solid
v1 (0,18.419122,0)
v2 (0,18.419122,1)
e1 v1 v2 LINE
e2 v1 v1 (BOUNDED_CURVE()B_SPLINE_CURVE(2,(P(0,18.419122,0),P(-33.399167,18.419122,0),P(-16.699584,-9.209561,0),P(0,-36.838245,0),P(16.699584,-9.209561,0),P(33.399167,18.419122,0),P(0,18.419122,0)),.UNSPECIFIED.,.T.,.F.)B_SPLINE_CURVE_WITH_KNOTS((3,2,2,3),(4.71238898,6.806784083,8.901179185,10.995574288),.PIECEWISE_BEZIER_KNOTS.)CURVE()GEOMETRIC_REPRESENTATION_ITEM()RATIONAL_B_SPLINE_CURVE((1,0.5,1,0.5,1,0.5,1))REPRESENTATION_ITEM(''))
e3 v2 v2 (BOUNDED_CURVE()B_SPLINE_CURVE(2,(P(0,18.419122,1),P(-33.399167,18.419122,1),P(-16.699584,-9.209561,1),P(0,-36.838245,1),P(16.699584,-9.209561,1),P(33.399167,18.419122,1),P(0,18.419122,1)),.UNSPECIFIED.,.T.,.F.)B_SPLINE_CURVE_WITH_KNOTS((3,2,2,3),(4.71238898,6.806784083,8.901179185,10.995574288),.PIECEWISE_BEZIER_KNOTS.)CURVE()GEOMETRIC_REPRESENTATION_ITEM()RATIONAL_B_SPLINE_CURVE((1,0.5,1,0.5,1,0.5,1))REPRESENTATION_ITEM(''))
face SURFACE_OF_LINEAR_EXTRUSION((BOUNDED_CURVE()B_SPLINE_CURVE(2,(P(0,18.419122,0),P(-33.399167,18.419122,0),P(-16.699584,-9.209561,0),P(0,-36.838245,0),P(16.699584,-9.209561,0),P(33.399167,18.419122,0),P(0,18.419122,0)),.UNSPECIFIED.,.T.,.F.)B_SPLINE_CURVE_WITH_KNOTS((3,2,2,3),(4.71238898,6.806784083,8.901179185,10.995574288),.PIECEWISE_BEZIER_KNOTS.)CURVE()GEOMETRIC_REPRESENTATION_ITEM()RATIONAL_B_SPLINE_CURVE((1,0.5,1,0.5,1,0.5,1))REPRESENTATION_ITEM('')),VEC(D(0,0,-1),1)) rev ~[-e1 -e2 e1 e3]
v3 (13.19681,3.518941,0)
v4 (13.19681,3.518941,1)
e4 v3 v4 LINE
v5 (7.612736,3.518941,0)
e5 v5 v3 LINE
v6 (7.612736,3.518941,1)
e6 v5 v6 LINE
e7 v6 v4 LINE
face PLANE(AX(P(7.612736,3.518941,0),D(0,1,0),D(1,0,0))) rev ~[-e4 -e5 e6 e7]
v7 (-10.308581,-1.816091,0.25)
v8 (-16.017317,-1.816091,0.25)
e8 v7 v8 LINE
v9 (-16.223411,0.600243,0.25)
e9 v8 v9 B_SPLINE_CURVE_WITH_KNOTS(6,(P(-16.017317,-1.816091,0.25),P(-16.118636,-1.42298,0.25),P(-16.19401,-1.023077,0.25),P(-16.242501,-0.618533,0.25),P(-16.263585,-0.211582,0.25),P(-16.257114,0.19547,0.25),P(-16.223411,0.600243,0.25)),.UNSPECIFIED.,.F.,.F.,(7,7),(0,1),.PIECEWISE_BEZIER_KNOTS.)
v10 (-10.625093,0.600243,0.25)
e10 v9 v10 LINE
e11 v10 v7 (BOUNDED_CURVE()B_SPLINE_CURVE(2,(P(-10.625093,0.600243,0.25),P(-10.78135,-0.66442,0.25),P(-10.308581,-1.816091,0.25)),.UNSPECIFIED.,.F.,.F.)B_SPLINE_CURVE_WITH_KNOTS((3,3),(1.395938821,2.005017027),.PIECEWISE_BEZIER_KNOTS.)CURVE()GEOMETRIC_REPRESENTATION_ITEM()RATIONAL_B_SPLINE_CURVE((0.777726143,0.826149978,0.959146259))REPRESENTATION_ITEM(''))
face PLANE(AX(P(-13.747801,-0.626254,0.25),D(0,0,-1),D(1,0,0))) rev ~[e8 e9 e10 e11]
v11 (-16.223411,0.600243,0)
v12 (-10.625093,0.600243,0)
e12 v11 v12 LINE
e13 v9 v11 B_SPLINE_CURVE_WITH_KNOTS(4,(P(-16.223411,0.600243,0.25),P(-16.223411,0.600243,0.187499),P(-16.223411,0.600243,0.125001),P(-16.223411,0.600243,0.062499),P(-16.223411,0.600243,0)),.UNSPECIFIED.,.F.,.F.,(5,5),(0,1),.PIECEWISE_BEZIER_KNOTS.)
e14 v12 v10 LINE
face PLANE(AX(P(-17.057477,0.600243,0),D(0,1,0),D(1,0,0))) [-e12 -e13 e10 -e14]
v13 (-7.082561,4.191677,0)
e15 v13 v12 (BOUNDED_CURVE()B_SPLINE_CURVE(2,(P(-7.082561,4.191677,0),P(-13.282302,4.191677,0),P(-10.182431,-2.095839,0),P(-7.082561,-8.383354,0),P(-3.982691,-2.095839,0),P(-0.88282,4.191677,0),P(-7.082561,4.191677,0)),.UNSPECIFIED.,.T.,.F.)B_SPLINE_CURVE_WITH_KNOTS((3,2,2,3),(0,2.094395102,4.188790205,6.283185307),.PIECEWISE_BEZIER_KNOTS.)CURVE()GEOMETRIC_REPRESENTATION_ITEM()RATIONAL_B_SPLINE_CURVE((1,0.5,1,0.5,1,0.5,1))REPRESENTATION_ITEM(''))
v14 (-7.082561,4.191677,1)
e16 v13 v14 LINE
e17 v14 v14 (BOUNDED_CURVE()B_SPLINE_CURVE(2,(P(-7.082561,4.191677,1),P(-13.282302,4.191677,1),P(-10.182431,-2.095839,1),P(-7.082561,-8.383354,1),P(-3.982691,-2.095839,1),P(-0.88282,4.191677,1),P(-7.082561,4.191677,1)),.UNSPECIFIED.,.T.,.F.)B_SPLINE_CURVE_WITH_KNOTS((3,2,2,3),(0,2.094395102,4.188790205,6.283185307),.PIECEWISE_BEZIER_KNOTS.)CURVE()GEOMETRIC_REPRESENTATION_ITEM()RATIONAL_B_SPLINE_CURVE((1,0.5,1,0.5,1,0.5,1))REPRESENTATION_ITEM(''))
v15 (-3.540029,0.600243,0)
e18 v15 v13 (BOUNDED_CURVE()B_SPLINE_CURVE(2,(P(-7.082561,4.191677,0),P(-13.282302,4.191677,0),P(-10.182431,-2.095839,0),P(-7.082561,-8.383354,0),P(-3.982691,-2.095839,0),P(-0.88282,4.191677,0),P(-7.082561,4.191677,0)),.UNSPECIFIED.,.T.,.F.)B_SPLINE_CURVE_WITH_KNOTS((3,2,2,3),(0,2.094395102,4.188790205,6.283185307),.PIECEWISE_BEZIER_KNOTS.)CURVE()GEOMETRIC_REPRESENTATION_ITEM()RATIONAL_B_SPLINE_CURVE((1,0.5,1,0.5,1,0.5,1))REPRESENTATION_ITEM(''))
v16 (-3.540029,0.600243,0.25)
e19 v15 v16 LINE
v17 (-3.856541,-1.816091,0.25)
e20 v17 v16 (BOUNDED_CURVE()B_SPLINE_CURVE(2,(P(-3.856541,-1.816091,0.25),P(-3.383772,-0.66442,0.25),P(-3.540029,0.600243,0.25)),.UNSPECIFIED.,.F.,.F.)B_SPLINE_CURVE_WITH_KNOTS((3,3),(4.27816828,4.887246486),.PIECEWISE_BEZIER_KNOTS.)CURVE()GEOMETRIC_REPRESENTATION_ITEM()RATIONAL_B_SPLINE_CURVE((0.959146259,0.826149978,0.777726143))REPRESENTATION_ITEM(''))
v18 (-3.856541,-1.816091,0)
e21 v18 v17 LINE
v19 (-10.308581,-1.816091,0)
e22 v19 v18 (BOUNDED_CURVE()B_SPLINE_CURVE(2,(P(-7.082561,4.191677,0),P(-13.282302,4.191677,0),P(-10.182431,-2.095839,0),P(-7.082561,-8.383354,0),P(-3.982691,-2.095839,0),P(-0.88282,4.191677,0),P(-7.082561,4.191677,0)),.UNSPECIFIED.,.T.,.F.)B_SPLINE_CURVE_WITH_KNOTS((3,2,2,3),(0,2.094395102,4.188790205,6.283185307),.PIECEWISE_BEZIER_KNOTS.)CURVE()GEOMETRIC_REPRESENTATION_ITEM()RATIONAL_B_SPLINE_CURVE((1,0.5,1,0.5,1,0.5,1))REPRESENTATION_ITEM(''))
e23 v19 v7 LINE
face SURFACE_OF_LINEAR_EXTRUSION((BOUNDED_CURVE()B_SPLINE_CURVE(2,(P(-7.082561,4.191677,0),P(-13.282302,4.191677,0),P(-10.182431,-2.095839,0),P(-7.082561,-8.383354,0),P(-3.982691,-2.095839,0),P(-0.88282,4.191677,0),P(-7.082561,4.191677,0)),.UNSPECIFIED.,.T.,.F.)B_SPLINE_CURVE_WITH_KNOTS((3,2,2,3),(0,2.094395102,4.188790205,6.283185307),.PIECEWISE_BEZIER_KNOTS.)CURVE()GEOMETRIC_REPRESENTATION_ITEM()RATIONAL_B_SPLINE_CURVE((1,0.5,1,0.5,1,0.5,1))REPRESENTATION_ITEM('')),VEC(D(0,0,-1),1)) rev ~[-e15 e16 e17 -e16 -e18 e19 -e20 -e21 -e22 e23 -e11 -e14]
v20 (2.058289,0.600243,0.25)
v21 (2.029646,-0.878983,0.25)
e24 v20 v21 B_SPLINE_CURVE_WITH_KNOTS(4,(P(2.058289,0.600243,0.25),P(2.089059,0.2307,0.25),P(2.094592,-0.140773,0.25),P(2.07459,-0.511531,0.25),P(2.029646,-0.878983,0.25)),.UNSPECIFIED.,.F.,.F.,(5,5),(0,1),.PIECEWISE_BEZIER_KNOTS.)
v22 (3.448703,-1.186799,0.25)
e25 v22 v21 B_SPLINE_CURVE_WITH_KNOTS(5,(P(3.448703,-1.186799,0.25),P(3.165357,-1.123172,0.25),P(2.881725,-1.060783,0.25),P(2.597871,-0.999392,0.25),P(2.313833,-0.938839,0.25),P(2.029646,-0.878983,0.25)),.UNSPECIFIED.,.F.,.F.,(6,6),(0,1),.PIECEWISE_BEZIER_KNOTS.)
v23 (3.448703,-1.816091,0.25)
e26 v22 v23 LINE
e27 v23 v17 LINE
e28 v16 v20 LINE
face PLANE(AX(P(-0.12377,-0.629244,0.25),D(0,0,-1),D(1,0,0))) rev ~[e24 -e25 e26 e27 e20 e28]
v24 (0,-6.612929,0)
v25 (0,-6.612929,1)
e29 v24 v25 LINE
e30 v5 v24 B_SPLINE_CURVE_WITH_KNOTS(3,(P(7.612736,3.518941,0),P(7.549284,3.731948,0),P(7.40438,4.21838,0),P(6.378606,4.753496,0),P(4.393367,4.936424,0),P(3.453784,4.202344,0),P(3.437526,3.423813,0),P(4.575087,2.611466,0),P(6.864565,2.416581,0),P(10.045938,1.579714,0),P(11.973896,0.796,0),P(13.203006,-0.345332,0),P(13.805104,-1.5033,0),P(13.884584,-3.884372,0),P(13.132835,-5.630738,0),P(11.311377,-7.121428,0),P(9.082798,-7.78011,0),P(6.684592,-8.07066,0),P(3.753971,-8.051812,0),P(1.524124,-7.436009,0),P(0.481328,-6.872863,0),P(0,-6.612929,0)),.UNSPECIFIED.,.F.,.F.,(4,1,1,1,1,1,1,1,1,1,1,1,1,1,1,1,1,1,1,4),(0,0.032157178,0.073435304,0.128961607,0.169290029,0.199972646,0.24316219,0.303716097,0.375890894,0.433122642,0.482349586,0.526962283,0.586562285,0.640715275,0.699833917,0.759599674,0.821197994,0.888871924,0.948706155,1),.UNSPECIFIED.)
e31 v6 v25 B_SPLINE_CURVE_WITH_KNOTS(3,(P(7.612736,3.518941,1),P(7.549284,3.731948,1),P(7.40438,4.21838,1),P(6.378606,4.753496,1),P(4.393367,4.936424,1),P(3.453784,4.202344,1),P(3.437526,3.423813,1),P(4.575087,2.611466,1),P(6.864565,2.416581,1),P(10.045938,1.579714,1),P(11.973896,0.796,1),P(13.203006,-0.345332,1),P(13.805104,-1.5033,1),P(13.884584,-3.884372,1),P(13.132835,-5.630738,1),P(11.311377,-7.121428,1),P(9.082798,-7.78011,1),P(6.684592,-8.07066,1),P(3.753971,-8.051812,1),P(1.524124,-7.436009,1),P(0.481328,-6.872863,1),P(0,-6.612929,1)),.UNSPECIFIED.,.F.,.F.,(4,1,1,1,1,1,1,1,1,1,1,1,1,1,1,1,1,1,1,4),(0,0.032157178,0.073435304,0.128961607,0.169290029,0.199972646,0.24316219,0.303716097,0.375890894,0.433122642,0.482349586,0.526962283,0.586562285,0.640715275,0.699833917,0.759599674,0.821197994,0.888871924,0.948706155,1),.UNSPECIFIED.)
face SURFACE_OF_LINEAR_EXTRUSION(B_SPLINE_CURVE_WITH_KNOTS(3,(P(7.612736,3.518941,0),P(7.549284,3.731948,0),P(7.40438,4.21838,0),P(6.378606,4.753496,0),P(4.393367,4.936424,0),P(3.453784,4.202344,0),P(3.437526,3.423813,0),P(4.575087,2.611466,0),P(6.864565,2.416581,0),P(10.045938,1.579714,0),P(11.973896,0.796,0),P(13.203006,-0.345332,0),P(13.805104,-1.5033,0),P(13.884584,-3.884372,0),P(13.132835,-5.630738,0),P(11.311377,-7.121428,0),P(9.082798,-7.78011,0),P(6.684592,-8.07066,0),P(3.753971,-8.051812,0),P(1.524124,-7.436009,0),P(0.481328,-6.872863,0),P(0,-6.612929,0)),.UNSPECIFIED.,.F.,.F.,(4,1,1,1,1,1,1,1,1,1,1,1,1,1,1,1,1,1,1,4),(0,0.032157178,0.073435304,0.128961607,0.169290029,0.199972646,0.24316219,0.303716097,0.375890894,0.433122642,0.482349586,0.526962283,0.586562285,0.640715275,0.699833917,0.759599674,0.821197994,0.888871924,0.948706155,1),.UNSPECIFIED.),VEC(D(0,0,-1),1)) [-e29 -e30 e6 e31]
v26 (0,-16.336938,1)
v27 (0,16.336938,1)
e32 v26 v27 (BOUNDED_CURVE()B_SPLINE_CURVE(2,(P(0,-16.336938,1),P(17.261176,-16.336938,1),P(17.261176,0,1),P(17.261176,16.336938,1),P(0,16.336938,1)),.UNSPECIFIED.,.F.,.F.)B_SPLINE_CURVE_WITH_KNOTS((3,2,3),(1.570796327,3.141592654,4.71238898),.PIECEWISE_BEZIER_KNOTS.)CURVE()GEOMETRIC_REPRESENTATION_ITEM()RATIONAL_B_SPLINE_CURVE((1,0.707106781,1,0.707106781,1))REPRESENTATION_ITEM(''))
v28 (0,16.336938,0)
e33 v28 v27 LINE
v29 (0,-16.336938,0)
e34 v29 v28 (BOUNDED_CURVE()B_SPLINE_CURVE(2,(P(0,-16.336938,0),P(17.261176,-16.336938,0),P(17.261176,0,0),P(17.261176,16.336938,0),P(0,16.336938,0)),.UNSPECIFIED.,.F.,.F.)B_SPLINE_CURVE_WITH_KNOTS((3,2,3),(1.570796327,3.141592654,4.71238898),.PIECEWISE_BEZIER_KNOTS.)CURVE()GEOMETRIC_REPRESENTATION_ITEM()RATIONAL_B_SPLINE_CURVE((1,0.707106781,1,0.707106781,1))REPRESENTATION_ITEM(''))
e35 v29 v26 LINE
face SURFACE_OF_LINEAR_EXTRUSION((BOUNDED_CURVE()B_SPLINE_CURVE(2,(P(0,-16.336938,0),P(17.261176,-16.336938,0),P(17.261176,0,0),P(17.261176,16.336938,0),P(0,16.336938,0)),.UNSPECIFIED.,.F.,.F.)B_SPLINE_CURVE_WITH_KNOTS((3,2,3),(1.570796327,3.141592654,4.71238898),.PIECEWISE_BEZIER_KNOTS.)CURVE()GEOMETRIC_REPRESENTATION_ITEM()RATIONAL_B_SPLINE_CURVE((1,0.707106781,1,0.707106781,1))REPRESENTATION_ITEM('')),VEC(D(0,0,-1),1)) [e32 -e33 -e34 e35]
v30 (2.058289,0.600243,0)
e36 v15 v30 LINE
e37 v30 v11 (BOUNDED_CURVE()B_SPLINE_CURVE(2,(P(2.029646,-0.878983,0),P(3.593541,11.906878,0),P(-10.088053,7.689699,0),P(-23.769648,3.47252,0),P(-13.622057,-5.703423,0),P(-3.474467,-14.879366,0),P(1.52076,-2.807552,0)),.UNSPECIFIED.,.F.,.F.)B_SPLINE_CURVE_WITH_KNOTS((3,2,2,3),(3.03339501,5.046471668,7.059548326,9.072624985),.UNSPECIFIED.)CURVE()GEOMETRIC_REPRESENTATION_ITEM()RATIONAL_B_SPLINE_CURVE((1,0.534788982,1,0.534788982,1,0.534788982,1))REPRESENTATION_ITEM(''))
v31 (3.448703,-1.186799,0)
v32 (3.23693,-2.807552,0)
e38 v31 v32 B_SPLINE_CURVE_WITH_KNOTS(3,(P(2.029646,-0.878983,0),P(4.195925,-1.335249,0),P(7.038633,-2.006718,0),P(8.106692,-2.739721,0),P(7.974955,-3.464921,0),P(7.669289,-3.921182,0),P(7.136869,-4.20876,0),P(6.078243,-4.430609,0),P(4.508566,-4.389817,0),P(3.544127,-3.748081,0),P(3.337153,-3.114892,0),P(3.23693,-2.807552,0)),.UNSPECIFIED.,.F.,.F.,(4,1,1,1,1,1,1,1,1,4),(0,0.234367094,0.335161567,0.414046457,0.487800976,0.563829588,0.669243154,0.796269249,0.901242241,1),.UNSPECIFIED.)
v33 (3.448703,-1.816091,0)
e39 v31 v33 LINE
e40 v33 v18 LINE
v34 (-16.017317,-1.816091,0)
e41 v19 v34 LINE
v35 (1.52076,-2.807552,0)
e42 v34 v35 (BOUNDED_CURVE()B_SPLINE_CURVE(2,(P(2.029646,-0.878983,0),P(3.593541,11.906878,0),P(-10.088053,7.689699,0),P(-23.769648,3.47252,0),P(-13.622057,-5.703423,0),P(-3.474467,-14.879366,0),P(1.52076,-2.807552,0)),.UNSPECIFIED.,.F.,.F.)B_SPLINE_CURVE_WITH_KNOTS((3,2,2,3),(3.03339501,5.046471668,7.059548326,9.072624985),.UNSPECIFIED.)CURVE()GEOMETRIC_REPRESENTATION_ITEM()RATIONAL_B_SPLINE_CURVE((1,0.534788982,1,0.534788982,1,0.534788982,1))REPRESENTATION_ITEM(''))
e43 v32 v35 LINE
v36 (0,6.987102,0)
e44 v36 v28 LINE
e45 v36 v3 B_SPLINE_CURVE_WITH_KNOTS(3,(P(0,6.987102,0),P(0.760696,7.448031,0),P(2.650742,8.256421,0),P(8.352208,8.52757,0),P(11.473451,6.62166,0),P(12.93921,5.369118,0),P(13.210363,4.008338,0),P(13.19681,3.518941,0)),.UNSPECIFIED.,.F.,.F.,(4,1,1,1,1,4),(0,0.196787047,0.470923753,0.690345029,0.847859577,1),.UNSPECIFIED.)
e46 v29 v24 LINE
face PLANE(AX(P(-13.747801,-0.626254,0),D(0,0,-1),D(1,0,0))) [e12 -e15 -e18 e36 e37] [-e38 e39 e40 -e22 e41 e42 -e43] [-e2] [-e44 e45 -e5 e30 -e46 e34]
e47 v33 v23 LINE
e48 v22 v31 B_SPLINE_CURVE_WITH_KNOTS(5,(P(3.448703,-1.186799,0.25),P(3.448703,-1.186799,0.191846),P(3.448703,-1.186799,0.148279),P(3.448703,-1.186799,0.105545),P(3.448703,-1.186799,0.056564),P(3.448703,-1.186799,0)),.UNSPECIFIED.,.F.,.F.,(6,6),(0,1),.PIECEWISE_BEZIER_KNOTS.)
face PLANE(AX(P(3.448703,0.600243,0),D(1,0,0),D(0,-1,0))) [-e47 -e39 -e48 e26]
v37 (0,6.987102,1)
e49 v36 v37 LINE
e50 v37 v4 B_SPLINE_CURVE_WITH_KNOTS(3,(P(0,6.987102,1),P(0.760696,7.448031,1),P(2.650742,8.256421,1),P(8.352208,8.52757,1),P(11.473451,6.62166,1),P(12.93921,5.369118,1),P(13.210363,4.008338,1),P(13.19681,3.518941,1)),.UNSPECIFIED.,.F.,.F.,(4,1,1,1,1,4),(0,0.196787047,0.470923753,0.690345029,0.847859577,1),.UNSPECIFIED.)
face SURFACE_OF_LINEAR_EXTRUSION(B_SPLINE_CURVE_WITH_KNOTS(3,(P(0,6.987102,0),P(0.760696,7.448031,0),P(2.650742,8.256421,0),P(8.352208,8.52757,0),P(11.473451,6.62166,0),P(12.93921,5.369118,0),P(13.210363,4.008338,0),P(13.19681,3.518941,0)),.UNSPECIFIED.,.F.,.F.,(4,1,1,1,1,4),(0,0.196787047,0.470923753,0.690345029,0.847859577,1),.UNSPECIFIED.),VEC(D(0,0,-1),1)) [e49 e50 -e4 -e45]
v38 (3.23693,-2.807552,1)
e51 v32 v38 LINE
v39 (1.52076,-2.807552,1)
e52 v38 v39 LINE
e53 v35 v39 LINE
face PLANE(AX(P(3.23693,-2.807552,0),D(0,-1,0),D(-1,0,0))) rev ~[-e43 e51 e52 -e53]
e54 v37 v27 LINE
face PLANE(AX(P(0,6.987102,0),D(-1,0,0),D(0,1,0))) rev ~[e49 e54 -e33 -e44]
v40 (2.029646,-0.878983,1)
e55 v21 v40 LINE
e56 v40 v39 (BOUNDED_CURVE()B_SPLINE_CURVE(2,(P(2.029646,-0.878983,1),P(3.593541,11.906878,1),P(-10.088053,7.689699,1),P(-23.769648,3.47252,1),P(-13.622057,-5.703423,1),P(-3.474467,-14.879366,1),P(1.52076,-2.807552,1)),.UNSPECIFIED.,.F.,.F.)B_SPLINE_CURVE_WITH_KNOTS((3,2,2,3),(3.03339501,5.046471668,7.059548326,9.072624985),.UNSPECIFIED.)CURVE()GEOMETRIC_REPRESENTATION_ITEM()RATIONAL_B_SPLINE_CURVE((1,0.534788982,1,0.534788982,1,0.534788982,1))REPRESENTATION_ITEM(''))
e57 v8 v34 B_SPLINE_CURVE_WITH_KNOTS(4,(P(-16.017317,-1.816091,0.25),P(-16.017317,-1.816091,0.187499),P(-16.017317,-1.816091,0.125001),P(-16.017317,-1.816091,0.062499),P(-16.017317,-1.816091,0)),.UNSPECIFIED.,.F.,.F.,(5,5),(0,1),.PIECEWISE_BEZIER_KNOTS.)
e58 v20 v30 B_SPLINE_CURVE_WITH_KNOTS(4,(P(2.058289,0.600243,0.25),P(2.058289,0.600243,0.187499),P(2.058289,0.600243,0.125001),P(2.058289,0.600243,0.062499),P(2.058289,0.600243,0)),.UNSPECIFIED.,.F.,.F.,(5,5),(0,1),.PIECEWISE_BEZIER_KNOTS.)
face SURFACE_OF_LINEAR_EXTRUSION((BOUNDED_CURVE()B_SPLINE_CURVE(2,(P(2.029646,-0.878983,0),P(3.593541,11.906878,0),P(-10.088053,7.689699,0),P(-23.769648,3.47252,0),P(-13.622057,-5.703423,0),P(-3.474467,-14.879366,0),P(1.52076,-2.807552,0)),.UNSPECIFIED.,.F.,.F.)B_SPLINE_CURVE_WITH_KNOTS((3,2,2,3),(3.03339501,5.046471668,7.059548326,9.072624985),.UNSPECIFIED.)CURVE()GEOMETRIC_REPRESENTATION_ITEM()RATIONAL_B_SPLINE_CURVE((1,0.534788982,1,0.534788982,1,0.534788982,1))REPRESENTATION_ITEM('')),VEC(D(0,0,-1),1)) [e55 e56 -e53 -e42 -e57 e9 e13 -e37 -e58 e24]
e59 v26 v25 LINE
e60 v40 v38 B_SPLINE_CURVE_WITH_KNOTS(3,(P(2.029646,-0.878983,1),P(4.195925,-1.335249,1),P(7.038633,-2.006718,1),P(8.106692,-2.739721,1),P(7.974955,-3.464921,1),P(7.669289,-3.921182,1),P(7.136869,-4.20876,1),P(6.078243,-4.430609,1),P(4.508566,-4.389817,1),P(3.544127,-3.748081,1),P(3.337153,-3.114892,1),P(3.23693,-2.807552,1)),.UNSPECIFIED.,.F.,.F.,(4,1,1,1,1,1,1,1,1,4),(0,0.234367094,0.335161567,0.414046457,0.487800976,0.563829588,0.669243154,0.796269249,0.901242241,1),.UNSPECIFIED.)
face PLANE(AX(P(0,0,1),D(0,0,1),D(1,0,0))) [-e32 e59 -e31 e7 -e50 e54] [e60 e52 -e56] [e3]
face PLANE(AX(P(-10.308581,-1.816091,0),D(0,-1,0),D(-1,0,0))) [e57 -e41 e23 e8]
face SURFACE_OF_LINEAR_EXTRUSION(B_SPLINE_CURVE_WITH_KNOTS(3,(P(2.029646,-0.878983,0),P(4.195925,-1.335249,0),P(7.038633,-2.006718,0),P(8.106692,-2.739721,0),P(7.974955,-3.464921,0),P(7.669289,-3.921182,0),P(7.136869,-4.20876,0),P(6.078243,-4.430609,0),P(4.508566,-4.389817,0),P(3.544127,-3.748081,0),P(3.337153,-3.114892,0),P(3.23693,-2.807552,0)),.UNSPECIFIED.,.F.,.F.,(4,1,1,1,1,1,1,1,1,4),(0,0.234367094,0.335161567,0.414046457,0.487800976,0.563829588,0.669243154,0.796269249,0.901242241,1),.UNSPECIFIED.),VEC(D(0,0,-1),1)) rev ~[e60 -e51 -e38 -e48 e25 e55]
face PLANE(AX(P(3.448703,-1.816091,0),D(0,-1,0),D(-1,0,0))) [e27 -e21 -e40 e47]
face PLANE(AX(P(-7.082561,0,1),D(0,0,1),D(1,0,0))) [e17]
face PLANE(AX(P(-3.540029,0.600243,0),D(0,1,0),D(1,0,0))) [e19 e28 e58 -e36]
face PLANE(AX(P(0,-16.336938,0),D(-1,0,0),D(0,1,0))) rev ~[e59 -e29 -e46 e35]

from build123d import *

# Parameters (mm, degrees)
F1_DEPTH = 1
F3_DEPTH = 0.25


with BuildPart() as f1:
    # F0 (on Top) → F1 (new body)
    with BuildSketch(Plane.XY):
        with BuildLine():
            add(Edge.make_bspline(
                [(0, 18.4191223234), (-33.3991670014, 18.4191223234), (-16.6995835007, -9.2095611617), (0, -36.8382446468), (16.6995835007, -9.2095611617), (33.3991670014, 18.4191223234), (0, 18.4191223234)],
                knots=[4.7123889804, 4.7123889804, 4.7123889804, 6.8067840828, 6.8067840828, 8.9011791852, 8.9011791852, 10.9955742876, 10.9955742876, 10.9955742876], degree=2, weights=[1, 0.5, 1, 0.5, 1, 0.5, 1]))
        make_face()
        with BuildLine():
            add(Edge.make_bspline(
                [(2.0296457511, -0.8789825634), (3.5935408506, 11.9068781884), (-10.0880534393, 7.6896991514), (-23.7696477292, 3.4725201143), (-13.6220573579, -5.7034228185), (-3.4744669867, -14.8793657512), (1.5207597149, -2.8075522278)],
                knots=[3.0333950097, 3.0333950097, 3.0333950097, 5.046471668, 5.046471668, 7.0595483262, 7.0595483262, 9.0726249845, 9.0726249845, 9.0726249845], degree=2, weights=[1, 0.534788982, 1, 0.534788982, 1, 0.534788982, 1]))
            add(Edge.make_bspline(
                [(2.0296457511, -0.8789825634), (4.1959245459, -1.3352487154), (7.0386333554, -2.0067184488), (8.1066923125, -2.7397210922), (7.9749546998, -3.4649214618), (7.6692887662, -3.9211820916), (7.1368685251, -4.208759588), (6.078243389, -4.4306087243), (4.5085657916, -4.3898169984), (3.5441273351, -3.7480814881), (3.3371528109, -3.1148922406), (3.2369296532, -2.8075522278)],
                knots=[0, 0, 0, 0, 0.2343670941, 0.335161567, 0.4140464567, 0.4878009759, 0.5638295882, 0.6692431543, 0.7962692486, 0.9012422415, 1, 1, 1, 1], degree=3))
            Line((3.2369296532, -2.8075522278), (1.5207597149, -2.8075522278))
        make_face(mode=Mode.SUBTRACT)
        with BuildLine():
            add(Edge.make_bspline(
                [(0, -16.3369383663), (17.2611761703, -16.3369383663), (17.2611761703, 0), (17.2611761703, 16.3369383663), (0, 16.3369383663)],
                knots=[1.5707963268, 1.5707963268, 1.5707963268, 3.1415926536, 3.1415926536, 4.7123889804, 4.7123889804, 4.7123889804], degree=2, weights=[1, 0.7071067812, 1, 0.7071067812, 1]))
            Line((0, -16.3369383663), (0, -6.6129290499))
            add(Edge.make_bspline(
                [(7.61273643, 3.5189409862), (7.5492835479, 3.731948283), (7.4043802357, 4.2183795026), (6.3786057962, 4.753495834), (4.3933672516, 4.9364243675), (3.4537842591, 4.2023441233), (3.4375255832, 3.4238125679), (4.5750871668, 2.6114661931), (6.8645652894, 2.4165807755), (10.0459375782, 1.5797137112), (11.9738960783, 0.795999988), (13.2030055129, -0.3453323538), (13.8051043581, -1.5032996243), (13.8845839789, -3.8843721599), (13.1328347988, -5.6307377555), (11.3113774877, -7.1214281823), (9.0827977138, -7.7801100525), (6.6845921999, -8.0706595629), (3.7539711861, -8.0518122863), (1.5241242069, -7.4360089256), (0.4813278293, -6.8728627535), (0, -6.6129290499)],
                knots=[0, 0, 0, 0, 0.0321571784, 0.0734353036, 0.1289616072, 0.1692900289, 0.1999726456, 0.2431621905, 0.3037160967, 0.3758908937, 0.4331226424, 0.4823495864, 0.5269622834, 0.5865622852, 0.6407152751, 0.6998339169, 0.7595996736, 0.8211979939, 0.8888719243, 0.9487061553, 1, 1, 1, 1], degree=3))
            Line((7.61273643, 3.5189409862), (13.1968103375, 3.5189409862))
            add(Edge.make_bspline(
                [(0, 6.9871020569), (0.7606964125, 7.4480307471), (2.650742106, 8.2564214656), (8.352208493, 8.5275699755), (11.4734513806, 6.621659875), (12.9392099186, 5.3691184552), (13.2103626649, 4.0083383332), (13.1968103375, 3.5189409862)],
                knots=[0, 0, 0, 0, 0.1967870469, 0.4709237532, 0.6903450292, 0.847859577, 1, 1, 1, 1], degree=3))
            Line((0, 6.9871020569), (0, 16.3369383663))
        make_face(mode=Mode.SUBTRACT)
    extrude(amount=F1_DEPTH)



with BuildPart() as f1b:
    # F0 (on Top) → F1, piece 2 (new body)
    with BuildSketch(Plane.XY):
        with BuildLine():
            add(Edge.make_bspline(
                [(-7.082561031, 4.1916770861), (-13.2823019673, 4.1916770861), (-10.1824314992, -2.095838543), (-7.082561031, -8.3833541721), (-3.9826905628, -2.095838543), (-0.8828200947, 4.1916770861), (-7.082561031, 4.1916770861)],
                knots=[0, 0, 0, 2.0943951024, 2.0943951024, 4.1887902048, 4.1887902048, 6.2831853072, 6.2831853072, 6.2831853072], degree=2, weights=[1, 0.5, 1, 0.5, 1, 0.5, 1]))
        make_face()
    extrude(amount=F1_DEPTH)


with BuildPart() as f1_1:
    add(f1.part)

    add(f1b.part)  # F3 merges F1b
    # F2 (on face) → F3 (join)
    with BuildSketch(Plane(origin=(0, 0, 0), x_dir=(1, 0, 0), z_dir=(0, 0, -1))):
        with BuildLine():
            Line((-10.3085811752, 1.8160907784), (-16.9921703637, 1.8160907784))
            Line((-16.9921703637, 1.8160907784), (-17.0574765652, -0.6002428127))
            Line((-17.0574765652, -0.6002428127), (-10.6250934455, -0.6002428127))
            add(Edge.make_bspline(
                [(-10.6250934455, -0.6002428127), (-10.7813500013, 0.6644204956), (-10.3085811752, 1.8160907784)],
                knots=[1.3959388214, 1.3959388214, 1.3959388214, 2.0050170271, 2.0050170271, 2.0050170271], degree=2, weights=[0.7777261433, 0.8261499779, 0.9591462586]))
        make_face()
        with BuildLine():
            Line((3.4487033263, 1.8160907784), (-3.8565408868, 1.8160907784))
            add(Edge.make_bspline(
                [(-3.8565408868, 1.8160907784), (-3.3837720607, 0.6644204956), (-3.5400286164, -0.6002428127)],
                knots=[4.27816828, 4.27816828, 4.27816828, 4.8872464858, 4.8872464858, 4.8872464858], degree=2, weights=[0.9591462586, 0.8261499779, 0.7777261433]))
            Line((-3.5400286164, -0.6002428127), (3.4487033263, -0.6002428127))
            Line((3.4487033263, -0.6002428127), (3.4487033263, 1.8160907784))
        make_face()
    extrude(amount=-F3_DEPTH)


solid = f1_1.part
